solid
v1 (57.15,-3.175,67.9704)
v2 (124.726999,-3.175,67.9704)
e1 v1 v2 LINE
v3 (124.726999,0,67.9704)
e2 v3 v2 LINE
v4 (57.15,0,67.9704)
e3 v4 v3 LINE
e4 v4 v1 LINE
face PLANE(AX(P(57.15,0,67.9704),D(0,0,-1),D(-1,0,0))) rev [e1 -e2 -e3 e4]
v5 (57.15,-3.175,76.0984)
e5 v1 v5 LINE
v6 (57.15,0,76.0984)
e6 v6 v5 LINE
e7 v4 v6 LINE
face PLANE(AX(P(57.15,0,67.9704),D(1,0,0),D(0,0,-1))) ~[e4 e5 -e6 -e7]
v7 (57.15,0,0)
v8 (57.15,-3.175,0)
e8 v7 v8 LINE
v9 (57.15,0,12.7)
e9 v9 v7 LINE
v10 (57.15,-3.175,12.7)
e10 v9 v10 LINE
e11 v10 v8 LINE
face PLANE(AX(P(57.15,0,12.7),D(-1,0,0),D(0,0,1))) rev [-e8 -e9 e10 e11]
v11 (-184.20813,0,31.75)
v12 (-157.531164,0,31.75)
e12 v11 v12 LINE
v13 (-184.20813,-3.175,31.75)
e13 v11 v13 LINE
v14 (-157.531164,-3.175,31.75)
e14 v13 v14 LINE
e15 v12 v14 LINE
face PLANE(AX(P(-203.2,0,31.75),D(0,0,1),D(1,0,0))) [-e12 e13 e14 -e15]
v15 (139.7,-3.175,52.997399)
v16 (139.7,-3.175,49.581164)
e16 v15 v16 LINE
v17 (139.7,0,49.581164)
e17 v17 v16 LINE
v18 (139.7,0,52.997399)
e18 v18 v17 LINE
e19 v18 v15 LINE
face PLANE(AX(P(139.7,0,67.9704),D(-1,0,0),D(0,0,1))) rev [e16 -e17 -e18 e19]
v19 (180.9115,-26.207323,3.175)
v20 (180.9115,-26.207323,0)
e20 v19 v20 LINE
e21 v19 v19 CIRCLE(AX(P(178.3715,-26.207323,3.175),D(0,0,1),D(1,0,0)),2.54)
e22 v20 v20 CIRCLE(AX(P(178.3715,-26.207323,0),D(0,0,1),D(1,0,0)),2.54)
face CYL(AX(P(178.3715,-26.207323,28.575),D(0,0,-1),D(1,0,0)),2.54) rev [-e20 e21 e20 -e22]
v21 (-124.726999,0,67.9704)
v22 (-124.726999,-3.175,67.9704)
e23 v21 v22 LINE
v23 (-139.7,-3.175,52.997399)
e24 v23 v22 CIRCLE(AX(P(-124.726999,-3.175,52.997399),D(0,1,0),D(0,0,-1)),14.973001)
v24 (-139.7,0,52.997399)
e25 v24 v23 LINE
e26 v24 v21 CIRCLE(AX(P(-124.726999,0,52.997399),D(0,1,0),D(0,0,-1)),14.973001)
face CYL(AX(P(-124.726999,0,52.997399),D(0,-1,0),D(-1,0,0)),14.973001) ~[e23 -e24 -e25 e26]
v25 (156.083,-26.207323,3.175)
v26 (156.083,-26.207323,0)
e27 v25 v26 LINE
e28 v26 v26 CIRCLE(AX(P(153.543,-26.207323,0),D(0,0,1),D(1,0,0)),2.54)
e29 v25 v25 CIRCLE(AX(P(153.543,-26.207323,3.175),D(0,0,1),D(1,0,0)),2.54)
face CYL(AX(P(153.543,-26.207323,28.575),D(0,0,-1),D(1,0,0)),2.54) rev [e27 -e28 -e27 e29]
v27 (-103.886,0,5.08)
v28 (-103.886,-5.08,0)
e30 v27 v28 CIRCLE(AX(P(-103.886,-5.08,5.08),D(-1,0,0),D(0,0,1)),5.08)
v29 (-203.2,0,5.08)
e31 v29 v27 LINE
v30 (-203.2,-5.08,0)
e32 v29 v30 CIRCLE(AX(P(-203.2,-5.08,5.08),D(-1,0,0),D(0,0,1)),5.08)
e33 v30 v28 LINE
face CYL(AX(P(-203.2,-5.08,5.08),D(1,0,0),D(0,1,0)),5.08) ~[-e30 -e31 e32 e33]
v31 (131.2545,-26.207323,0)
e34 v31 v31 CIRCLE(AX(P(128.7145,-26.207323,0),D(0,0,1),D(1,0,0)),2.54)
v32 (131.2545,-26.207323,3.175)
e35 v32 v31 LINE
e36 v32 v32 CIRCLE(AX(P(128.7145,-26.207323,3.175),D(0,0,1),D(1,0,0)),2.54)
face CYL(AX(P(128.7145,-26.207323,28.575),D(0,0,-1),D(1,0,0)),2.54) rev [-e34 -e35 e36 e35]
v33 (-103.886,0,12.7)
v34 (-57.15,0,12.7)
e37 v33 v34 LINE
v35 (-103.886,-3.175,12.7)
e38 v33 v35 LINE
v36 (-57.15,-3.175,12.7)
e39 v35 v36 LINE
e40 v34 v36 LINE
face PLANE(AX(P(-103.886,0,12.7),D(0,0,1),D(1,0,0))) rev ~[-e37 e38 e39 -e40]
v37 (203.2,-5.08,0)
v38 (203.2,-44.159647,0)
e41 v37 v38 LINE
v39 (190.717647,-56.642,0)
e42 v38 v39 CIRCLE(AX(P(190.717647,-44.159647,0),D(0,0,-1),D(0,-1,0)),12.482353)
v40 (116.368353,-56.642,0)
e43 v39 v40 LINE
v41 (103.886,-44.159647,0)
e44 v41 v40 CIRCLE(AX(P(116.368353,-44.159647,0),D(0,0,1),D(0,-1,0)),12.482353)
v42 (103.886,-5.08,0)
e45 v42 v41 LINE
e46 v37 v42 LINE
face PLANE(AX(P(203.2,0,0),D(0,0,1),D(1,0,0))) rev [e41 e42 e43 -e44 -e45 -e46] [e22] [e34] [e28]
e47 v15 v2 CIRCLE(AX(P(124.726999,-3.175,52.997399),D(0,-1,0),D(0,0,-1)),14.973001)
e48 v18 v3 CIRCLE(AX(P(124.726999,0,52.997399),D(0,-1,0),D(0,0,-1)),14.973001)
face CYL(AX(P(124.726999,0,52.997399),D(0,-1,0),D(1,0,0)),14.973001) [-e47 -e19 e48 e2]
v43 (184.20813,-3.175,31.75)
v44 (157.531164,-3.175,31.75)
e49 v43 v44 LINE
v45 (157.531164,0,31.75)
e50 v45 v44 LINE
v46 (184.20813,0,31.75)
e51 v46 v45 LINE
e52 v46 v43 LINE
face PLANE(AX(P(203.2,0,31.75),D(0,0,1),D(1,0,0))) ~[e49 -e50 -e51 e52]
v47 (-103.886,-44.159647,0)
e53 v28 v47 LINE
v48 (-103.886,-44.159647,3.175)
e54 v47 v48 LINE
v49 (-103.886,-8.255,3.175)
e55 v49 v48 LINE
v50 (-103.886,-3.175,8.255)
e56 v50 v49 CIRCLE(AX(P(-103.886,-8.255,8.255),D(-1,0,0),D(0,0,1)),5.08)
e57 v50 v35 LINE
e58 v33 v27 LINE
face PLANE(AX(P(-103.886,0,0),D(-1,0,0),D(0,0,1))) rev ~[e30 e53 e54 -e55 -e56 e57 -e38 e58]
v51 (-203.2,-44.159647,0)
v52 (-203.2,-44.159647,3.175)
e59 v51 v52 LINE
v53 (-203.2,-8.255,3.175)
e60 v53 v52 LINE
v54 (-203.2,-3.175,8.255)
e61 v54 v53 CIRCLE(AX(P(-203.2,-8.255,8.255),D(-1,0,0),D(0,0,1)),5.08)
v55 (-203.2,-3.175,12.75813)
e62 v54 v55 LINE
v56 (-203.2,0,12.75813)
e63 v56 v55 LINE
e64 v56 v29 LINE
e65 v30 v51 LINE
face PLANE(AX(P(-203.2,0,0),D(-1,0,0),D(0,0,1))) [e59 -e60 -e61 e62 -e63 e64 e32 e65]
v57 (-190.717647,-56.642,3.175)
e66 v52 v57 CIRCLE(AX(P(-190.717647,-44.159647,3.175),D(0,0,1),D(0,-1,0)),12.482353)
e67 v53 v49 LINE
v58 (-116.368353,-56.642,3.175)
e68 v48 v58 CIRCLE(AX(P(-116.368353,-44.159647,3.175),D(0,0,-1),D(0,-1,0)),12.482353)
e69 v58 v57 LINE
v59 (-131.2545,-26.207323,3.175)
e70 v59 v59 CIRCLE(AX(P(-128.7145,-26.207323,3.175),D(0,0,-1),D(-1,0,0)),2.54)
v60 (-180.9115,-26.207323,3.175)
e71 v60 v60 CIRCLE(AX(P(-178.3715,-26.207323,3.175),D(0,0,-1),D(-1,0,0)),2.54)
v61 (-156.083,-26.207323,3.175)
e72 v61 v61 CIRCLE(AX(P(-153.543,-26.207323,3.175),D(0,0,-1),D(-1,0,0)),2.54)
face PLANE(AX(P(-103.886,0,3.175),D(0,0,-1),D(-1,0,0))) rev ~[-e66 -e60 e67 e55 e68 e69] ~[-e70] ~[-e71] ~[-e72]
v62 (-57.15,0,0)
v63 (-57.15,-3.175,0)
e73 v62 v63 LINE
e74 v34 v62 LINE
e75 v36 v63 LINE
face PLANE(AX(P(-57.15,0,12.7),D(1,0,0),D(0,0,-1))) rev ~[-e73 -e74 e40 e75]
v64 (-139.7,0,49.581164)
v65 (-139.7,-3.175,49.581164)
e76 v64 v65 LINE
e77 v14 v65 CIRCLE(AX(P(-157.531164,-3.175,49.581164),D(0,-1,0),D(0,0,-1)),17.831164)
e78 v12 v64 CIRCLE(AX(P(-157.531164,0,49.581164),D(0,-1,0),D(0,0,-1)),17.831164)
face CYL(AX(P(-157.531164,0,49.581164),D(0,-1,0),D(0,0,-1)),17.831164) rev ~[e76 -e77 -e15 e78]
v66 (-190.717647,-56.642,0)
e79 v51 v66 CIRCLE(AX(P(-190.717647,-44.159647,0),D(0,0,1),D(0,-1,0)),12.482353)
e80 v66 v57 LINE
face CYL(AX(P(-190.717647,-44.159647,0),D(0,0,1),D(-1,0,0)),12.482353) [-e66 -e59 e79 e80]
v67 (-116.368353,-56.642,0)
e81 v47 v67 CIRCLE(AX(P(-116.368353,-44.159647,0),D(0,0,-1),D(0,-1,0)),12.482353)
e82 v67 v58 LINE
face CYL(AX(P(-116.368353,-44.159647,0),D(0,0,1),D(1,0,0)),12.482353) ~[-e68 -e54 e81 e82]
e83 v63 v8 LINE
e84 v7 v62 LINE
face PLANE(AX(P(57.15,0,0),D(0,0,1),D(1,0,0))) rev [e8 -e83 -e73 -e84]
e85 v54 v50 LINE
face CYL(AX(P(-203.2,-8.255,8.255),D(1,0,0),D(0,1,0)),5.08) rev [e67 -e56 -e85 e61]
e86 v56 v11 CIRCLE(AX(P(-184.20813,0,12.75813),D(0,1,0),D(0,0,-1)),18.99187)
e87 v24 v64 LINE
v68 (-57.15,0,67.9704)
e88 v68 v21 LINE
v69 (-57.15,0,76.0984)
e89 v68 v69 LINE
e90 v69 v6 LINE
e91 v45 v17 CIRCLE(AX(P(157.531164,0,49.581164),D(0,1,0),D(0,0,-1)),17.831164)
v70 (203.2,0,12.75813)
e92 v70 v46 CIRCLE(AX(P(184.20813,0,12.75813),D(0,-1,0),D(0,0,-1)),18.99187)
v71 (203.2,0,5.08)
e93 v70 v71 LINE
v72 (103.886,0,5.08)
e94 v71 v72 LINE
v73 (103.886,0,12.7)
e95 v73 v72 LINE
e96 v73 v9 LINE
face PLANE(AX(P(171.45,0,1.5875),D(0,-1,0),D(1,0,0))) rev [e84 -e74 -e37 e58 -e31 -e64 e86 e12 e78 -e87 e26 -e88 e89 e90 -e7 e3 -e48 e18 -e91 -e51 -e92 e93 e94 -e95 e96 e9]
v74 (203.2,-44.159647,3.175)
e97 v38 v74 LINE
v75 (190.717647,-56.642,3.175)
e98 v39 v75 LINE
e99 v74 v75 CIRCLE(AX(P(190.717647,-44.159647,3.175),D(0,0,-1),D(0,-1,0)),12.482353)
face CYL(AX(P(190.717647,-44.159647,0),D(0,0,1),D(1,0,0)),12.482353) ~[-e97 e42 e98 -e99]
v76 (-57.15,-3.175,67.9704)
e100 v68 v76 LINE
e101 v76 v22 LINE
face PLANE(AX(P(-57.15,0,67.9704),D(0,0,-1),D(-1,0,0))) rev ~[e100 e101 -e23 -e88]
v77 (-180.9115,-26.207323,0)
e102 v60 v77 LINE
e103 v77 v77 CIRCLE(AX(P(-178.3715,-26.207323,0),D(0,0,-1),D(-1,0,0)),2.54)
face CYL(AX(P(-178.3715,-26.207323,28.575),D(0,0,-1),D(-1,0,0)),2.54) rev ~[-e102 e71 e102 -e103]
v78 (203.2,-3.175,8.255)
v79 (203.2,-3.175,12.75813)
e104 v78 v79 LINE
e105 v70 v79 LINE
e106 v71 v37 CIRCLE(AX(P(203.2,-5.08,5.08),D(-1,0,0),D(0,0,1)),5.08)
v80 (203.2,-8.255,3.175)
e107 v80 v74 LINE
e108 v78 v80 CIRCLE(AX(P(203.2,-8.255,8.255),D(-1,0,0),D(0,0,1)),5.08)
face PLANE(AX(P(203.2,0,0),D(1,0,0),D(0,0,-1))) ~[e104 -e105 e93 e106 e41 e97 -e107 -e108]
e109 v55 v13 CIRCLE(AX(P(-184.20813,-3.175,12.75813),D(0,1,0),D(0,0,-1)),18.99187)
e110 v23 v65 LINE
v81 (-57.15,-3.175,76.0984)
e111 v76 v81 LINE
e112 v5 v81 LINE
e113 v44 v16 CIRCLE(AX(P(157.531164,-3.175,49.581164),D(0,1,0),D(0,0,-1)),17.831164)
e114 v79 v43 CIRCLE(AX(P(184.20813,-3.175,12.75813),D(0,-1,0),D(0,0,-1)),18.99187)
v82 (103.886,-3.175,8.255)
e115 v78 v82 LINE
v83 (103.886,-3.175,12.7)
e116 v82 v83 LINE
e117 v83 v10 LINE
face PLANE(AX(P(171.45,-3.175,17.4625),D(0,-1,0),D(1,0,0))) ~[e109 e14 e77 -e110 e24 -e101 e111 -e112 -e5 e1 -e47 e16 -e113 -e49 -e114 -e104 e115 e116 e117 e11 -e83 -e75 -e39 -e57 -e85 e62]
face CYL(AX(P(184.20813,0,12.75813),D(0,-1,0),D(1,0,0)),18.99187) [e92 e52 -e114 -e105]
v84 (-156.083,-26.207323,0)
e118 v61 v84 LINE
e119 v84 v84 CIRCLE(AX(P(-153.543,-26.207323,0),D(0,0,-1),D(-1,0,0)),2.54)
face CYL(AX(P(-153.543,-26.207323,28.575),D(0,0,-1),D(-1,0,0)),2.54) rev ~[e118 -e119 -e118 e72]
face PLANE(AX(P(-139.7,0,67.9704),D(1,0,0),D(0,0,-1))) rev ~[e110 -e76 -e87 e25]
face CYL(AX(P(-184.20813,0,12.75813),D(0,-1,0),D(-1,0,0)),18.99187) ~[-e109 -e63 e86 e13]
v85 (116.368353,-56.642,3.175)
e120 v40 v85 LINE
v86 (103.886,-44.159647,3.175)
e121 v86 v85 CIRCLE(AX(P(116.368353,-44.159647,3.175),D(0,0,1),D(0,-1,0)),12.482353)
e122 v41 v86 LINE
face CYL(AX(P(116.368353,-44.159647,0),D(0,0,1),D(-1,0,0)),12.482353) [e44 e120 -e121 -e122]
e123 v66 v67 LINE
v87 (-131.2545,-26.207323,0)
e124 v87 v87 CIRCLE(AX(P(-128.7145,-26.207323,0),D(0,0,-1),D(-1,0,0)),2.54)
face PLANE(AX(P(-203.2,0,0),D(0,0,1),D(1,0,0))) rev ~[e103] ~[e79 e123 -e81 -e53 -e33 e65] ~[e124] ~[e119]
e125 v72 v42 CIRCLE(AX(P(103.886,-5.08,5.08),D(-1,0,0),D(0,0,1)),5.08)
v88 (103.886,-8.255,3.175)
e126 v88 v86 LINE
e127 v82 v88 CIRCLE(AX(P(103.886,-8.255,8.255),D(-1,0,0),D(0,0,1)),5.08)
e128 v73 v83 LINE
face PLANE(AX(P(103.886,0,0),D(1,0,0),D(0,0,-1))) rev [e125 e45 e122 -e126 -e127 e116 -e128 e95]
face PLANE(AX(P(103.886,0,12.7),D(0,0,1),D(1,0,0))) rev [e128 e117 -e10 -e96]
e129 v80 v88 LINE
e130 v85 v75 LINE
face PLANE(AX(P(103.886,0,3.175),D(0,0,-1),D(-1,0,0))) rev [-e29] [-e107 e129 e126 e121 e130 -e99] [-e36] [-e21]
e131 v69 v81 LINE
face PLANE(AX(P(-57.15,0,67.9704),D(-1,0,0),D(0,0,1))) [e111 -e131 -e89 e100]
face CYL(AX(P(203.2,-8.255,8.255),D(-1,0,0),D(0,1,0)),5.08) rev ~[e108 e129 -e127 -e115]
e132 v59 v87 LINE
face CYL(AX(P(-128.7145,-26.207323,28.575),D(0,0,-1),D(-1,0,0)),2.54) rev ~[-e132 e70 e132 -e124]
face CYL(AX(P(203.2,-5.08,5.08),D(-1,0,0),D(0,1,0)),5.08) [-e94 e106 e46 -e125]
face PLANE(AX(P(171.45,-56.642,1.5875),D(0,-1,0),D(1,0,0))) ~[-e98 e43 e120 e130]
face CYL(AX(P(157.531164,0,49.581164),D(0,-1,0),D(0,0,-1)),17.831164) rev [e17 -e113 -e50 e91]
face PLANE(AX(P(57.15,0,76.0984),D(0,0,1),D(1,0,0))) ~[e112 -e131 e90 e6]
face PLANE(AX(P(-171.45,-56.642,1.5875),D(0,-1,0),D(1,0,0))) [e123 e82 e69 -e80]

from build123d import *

# Parameters (mm, degrees)
F0_W     = 63.5
F0_H     = 28.575
F0_W_2   = 46.736
F0_H_2   = 27.6352
F0_W_3   = 57.15
F0_H_3   = 8.128
F1_DEPTH = 3.175
F0_H_4   = 3.175
F0_W_4   = 35.814
F2_DEPTH = 56.642
F3_R     = 18.991869689
F4_R     = 17.8311640925
F5_R     = 14.9730007981
F6_R     = 5.08
F7_R     = 12.4823532344
F9_D     = 5.08
F9_DEPTH = 25.4
F9_TIP   = 1.5261859723


# Not quite as in the source:
# - a feature names something its author has since deleted; it is built from what else it names


with BuildPart() as f1:
    # F0 (on Front) → F1 (new body)
    with BuildSketch(Plane.XZ):
        with Locations((-171.45, 17.4625)):
            Rectangle(F0_W, F0_H)
        Polygon((-57.15, 0), (0, 0), (0, 40.3352), (-57.15, 40.3352), (-57.15, 12.7), align=None)
        with Locations((-80.518, 26.5176)):
            Rectangle(F0_W_2, F0_H_2)
        with Locations((-80.518, 54.1528)):
            Rectangle(F0_W_2, F0_H_2)
        Polygon((-103.886, 3.175), (-103.886, 12.7), (-103.886, 40.3352), (-103.886, 67.9704), (-139.7, 67.9704), (-139.7, 31.75), (-139.7, 3.175), align=None)
        with Locations((-28.575, 54.1528)):
            Rectangle(F0_W_3, F0_H_2)
        with Locations((-28.575, 72.0344)):
            Rectangle(F0_W_3, F0_H_3)
    extrude(amount=F1_DEPTH)

    # F0 (on Front) → F2 (join)
    with BuildSketch(Plane.XZ):
        with Locations((-171.45, 1.5875)):
            Rectangle(F0_W, F0_H_4)
        with Locations((-121.793, 1.5875)):
            Rectangle(F0_W_4, F0_H_4)
    extrude(amount=F2_DEPTH)

    # F3
    f3_edges = [f1.edges().sort_by_distance(p)[0] for p in [
        (-203.2, -1.5875, 31.75),
    ]]
    fillet(f3_edges, radius=F3_R)

    # F4
    f4_edges = [f1.edges().sort_by_distance(p)[0] for p in [
        (-139.7, -1.5875, 31.75),
    ]]
    fillet(f4_edges, radius=F4_R)

    # F5
    f5_edges = [f1.edges().sort_by_distance(p)[0] for p in [
        (-139.7, -1.5875, 67.9704),
    ]]
    fillet(f5_edges, radius=F5_R)

    # F6
    f6_edges = [f1.edges().sort_by_distance(p)[0] for p in [
        (-153.543, 0, 0),
        (-153.543, -3.175, 3.175),
    ]]
    fillet(f6_edges, radius=F6_R)

    # F7
    f7_edges = [f1.edges().sort_by_distance(p)[0] for p in [
        (-103.886, -56.642, 1.5875),
        (-203.2, -56.642, 1.5875),
    ]]
    fillet(f7_edges, radius=F7_R)

    # F9
    with Locations(Plane.XY.offset(3.175)):
        with Locations((-153.543, -26.2073233828), (-128.7145, -26.2073233828), (-178.3715, -26.2073233828)):
            Hole(F9_D / 2, depth=F9_DEPTH)
            with Locations((0, 0, -(F9_DEPTH + F9_TIP / 2))):  # 118° drill point
                Cone(0, F9_D / 2, F9_TIP, mode=Mode.SUBTRACT)

    # F10: F1 across face


with BuildPart() as f1_1:
    add(f1.part)
    add(f1.part.mirror(Plane(origin=(0, -1.5875, 38.0492), x_dir=(0, 1, 0), z_dir=(1, 0, 0))))


solid = f1_1.part
